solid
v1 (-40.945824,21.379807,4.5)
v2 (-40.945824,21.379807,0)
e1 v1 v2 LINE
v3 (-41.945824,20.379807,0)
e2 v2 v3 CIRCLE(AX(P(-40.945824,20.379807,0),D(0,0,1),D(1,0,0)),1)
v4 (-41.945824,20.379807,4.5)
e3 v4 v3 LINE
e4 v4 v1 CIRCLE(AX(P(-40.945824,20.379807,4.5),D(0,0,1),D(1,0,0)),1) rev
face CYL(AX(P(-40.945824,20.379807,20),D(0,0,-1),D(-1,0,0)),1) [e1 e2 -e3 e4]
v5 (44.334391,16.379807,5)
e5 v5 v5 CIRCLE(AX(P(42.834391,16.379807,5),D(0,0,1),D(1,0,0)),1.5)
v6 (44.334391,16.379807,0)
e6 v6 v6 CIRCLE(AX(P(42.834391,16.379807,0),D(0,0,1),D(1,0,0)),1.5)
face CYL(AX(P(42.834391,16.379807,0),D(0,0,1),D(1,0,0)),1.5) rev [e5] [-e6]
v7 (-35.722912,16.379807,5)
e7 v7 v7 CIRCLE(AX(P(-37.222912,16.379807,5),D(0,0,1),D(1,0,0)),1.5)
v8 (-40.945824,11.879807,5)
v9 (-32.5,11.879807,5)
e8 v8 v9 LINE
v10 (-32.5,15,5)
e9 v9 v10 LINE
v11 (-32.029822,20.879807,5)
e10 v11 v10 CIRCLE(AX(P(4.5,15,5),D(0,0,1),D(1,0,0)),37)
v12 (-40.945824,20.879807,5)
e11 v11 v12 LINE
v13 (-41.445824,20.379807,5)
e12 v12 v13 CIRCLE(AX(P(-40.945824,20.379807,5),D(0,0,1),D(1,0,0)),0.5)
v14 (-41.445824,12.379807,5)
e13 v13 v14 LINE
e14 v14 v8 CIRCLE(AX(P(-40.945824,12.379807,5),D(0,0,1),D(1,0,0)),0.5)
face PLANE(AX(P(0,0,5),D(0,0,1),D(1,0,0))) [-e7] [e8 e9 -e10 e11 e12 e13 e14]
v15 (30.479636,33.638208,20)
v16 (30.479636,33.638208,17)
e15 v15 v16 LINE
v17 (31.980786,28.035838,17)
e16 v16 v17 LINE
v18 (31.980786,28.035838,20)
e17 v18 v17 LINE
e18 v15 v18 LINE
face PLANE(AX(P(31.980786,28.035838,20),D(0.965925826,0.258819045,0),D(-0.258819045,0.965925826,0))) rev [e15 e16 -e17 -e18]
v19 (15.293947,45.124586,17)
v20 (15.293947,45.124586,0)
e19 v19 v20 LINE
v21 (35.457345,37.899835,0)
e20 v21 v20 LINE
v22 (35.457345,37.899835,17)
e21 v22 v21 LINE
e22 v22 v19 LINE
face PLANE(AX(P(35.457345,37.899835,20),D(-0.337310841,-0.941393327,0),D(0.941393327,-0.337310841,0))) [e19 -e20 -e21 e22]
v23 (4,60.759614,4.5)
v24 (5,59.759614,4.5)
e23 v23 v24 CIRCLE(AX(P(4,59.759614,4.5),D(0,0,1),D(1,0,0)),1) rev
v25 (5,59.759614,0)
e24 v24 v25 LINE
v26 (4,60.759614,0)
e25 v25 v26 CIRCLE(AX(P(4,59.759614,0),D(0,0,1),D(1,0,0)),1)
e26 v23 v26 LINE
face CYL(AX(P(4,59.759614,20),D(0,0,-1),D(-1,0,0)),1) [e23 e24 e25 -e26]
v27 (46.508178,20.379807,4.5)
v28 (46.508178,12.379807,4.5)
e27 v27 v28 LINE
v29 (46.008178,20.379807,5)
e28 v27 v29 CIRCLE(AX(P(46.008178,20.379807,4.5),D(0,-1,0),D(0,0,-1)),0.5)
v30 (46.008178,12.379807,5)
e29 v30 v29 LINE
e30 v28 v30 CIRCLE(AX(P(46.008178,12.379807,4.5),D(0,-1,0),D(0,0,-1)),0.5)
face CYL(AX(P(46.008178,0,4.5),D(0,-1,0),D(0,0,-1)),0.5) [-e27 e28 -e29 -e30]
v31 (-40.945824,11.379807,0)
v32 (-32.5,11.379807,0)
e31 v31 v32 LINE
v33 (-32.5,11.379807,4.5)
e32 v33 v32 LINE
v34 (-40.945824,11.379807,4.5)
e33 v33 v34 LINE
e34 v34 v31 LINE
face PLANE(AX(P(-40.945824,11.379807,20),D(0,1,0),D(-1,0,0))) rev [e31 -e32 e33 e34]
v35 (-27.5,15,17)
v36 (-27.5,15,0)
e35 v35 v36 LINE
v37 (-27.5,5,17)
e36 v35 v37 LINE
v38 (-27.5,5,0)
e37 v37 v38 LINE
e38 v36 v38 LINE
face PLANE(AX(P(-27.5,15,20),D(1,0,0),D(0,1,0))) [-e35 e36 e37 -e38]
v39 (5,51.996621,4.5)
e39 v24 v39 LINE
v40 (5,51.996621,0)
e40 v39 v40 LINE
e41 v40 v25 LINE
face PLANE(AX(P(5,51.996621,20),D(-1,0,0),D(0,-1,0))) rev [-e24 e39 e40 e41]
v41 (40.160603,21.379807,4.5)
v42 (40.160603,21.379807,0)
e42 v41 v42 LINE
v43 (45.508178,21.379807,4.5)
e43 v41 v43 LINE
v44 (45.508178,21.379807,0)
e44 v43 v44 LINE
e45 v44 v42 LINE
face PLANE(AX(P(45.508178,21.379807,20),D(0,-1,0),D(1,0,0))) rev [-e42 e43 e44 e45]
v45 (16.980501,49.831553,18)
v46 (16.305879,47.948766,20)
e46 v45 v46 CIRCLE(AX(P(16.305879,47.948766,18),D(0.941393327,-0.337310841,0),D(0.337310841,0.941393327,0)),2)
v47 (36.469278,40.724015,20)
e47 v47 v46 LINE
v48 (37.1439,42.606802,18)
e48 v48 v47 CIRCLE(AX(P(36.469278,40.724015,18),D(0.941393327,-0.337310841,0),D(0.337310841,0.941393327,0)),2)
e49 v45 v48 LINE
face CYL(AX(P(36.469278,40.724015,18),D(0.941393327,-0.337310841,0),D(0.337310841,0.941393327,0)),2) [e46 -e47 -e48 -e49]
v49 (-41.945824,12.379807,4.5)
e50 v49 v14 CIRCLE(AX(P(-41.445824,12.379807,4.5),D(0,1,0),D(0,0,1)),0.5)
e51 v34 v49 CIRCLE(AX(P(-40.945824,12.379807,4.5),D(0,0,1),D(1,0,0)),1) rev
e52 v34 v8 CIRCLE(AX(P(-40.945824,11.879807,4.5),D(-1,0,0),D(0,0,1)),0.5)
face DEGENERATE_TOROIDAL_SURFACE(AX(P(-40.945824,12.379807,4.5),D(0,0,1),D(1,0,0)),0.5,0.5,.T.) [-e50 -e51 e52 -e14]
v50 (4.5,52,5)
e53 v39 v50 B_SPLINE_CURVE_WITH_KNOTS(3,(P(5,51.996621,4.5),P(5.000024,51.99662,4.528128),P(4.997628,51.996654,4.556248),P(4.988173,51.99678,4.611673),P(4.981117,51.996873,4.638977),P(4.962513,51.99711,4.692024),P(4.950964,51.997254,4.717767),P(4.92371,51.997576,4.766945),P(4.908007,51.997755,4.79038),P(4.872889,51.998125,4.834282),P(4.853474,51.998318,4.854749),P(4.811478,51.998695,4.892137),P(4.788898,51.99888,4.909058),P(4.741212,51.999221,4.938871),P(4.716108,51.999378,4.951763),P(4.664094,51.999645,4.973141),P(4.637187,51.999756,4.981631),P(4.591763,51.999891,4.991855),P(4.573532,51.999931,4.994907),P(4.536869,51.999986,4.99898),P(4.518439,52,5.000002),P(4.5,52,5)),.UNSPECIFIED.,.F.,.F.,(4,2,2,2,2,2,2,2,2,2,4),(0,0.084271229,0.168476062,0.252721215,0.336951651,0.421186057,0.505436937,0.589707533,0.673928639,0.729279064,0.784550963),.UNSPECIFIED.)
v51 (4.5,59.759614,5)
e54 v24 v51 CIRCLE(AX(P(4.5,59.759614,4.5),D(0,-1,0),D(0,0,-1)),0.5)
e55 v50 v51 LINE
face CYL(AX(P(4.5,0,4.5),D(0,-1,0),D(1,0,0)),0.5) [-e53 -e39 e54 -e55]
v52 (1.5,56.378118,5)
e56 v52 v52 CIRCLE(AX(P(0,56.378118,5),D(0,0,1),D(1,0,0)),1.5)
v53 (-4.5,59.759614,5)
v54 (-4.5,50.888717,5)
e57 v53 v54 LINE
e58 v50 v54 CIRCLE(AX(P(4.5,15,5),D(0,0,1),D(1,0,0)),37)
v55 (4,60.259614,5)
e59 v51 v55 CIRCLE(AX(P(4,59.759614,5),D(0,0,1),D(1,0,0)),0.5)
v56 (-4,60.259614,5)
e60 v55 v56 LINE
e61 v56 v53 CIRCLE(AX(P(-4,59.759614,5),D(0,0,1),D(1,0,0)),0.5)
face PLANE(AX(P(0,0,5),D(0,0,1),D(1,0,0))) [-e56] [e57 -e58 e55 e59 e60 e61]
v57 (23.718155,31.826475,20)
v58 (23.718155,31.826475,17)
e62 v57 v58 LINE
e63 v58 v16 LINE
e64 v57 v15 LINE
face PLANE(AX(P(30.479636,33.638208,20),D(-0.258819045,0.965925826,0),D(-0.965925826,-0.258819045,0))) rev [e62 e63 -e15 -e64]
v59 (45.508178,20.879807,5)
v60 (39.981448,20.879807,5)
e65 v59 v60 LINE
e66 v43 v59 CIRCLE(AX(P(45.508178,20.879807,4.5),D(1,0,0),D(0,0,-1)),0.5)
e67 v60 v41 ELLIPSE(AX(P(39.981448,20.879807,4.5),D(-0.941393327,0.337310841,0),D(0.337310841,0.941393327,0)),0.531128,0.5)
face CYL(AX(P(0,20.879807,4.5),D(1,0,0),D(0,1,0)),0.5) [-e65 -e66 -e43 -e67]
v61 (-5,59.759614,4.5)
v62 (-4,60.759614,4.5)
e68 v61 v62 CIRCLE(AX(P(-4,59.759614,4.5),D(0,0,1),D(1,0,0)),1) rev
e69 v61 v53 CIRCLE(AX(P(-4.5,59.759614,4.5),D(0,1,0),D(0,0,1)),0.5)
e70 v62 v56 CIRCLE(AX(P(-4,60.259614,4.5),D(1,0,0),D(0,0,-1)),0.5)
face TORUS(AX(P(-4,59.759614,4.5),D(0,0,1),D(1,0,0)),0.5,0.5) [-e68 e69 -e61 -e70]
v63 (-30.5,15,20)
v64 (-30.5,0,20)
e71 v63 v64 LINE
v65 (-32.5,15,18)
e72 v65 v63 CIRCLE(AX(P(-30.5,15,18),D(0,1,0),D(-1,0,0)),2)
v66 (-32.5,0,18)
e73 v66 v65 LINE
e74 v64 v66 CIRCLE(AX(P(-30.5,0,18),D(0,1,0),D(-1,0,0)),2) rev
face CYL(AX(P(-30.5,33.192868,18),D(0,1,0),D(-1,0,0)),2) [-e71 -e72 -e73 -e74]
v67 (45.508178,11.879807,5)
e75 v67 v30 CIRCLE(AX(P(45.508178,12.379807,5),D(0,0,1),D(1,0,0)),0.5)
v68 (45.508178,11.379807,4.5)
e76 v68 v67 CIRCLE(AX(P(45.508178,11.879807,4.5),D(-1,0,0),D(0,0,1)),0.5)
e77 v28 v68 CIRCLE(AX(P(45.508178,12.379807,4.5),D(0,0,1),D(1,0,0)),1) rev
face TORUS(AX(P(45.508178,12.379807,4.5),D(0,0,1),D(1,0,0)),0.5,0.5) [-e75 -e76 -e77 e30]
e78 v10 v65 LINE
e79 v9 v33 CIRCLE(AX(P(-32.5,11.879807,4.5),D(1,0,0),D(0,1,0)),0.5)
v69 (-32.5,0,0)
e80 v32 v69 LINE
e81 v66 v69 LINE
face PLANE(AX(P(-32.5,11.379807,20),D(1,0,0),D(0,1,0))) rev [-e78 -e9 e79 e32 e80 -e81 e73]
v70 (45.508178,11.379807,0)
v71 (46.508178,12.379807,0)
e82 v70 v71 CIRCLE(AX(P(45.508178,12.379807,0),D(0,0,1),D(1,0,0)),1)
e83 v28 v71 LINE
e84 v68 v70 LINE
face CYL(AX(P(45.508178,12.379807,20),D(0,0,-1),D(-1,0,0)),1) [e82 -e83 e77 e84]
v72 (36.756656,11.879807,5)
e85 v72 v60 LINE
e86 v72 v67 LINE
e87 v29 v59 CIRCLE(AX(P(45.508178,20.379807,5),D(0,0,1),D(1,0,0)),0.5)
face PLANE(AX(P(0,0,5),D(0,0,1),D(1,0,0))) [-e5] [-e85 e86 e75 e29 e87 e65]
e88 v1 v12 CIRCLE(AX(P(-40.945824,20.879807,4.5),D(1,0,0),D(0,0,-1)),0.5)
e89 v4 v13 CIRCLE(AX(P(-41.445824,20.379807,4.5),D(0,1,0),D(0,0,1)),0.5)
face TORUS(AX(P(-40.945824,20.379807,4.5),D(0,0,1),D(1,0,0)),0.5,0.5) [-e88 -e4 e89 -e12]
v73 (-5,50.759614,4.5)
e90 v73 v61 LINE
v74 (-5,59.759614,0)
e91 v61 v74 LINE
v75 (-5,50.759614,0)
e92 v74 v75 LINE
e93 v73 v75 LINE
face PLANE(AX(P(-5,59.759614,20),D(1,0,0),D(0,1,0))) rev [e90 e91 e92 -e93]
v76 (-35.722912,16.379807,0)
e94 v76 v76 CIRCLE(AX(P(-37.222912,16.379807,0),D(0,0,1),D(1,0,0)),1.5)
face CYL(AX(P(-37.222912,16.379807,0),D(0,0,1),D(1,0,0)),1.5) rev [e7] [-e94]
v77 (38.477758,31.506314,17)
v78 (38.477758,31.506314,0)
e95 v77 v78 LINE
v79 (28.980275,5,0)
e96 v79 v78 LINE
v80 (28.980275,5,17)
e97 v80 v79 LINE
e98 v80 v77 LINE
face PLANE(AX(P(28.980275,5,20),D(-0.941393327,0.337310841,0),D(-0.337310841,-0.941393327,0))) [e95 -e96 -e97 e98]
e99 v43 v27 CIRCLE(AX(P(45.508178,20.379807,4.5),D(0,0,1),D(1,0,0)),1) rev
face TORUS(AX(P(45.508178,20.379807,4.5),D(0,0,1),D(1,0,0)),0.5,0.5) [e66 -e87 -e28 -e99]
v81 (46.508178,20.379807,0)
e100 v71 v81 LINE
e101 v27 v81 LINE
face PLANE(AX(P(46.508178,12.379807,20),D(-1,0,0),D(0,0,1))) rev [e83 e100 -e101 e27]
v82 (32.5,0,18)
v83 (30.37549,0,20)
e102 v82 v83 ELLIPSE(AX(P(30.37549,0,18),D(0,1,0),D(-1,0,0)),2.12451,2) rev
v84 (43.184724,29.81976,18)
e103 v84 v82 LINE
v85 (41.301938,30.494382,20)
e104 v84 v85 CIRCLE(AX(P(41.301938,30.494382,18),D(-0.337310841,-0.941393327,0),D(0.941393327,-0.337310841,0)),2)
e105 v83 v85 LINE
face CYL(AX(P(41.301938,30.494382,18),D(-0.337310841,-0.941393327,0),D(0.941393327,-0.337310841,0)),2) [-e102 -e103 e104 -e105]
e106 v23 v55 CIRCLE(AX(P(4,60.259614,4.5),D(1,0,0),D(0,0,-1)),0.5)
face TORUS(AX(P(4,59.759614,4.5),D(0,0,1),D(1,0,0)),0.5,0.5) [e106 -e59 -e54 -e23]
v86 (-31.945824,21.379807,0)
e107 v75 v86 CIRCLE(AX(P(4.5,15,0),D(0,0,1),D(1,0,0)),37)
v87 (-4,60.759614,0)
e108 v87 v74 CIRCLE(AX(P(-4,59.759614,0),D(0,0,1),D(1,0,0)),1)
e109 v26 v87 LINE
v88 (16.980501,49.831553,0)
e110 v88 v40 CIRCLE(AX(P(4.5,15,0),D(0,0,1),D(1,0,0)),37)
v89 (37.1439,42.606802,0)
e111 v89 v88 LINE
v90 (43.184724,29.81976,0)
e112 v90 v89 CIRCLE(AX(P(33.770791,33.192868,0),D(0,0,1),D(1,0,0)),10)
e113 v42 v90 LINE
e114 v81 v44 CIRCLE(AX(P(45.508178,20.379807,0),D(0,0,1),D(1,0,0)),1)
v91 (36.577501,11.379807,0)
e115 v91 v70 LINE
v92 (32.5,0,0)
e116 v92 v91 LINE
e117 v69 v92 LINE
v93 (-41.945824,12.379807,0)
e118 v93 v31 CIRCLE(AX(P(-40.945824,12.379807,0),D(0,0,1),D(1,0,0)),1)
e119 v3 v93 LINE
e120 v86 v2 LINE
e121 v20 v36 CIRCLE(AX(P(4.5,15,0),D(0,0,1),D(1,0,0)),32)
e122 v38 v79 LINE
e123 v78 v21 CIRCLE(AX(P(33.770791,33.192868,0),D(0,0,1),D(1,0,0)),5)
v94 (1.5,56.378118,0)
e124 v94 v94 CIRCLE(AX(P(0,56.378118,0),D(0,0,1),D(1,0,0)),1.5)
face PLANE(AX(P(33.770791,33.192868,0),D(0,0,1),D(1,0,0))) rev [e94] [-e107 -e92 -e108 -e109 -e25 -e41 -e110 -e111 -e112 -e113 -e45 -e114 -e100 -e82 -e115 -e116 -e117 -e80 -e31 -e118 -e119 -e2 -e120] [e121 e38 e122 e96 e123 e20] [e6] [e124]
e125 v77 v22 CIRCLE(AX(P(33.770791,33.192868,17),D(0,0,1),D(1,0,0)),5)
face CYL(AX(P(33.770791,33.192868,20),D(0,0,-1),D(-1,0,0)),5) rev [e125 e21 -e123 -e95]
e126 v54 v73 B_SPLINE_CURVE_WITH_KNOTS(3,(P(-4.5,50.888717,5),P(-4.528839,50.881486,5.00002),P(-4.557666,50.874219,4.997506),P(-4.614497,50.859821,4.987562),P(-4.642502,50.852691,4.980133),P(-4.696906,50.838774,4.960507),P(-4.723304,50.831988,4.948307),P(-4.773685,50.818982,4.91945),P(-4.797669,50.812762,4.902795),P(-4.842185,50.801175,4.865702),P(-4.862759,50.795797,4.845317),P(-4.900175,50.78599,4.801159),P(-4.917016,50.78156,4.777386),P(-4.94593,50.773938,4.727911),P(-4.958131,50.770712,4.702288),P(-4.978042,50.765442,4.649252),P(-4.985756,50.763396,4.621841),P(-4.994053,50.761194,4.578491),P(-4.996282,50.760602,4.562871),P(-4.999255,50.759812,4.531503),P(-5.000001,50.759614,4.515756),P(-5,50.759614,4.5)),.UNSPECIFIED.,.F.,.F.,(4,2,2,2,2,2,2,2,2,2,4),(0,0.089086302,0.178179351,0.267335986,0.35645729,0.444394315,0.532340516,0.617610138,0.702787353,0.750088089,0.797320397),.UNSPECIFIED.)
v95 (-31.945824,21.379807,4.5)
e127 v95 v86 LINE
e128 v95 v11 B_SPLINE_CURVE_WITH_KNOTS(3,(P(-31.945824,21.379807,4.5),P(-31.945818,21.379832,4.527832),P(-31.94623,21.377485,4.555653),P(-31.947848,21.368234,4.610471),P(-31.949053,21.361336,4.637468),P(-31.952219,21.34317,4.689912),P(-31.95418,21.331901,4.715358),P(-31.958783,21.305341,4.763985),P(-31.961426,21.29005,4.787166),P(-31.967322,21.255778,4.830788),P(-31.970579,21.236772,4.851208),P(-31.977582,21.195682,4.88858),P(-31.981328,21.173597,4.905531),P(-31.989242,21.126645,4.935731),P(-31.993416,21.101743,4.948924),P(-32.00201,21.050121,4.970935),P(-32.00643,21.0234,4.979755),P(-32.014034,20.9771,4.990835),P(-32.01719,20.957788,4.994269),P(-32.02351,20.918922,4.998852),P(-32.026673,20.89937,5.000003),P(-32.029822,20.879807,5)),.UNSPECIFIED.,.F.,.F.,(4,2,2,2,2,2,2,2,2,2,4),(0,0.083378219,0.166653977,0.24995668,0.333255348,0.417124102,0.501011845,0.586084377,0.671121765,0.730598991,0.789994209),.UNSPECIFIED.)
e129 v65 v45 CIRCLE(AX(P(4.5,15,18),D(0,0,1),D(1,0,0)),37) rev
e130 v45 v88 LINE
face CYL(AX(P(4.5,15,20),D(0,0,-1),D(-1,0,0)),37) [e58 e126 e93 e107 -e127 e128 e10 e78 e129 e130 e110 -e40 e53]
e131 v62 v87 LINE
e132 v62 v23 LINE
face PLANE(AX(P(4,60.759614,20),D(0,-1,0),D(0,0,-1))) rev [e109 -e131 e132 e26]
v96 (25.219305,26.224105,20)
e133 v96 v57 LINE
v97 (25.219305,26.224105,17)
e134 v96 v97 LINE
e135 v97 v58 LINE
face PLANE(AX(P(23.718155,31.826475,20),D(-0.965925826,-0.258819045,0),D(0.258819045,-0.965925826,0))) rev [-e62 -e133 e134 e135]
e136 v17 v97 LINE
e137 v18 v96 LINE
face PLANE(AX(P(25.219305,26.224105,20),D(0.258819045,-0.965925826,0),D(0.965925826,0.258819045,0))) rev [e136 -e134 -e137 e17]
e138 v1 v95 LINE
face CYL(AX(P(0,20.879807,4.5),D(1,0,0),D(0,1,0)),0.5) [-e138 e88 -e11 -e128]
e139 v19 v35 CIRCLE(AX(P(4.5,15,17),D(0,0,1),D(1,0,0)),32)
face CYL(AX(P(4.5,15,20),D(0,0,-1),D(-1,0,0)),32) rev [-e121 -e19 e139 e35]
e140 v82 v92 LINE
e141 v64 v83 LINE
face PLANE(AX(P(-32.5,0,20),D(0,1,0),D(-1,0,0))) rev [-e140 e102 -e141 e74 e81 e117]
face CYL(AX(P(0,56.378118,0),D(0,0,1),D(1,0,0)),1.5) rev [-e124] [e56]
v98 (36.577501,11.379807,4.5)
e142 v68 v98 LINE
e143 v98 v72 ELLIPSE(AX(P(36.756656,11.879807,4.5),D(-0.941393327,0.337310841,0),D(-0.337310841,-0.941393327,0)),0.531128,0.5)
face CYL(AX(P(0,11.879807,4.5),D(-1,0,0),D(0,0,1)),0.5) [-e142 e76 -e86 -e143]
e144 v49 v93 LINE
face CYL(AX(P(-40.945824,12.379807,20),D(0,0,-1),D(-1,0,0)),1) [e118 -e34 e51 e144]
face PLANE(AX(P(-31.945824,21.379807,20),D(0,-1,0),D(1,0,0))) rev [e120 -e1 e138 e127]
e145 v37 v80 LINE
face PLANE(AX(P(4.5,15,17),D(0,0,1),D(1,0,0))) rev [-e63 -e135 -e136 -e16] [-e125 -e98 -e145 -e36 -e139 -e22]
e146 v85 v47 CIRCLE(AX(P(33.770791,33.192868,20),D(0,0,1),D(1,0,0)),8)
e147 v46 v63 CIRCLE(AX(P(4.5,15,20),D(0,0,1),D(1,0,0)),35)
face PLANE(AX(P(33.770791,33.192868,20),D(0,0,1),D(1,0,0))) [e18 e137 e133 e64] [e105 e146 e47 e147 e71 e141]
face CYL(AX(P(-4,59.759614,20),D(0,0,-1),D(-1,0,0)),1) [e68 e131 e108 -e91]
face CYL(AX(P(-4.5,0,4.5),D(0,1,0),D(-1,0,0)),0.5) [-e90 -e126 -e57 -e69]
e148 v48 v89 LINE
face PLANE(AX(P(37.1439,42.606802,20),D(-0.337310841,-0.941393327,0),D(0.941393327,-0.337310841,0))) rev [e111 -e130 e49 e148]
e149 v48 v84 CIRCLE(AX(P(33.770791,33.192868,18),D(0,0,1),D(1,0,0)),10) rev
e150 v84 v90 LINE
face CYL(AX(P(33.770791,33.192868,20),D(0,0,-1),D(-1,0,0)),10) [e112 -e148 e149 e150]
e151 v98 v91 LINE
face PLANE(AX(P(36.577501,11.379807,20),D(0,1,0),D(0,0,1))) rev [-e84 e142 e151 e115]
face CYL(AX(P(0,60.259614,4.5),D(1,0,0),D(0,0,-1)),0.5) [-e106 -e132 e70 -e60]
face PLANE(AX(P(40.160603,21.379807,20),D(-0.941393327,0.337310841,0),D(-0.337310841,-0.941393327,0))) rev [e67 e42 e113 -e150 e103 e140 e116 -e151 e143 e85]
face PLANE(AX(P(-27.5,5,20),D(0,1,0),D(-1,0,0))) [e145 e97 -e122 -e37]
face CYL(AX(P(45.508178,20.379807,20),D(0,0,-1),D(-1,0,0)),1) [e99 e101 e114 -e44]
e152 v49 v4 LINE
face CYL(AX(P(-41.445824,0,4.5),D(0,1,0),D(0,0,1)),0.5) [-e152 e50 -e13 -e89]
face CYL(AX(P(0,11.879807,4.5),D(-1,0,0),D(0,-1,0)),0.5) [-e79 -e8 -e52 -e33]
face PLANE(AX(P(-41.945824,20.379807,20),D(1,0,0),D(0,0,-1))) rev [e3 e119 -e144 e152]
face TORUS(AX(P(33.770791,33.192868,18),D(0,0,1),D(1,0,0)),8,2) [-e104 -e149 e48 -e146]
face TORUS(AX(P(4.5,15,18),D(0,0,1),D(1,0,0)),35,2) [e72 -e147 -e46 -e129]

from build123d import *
from build123d.topology import SkipClean

# Parameters (mm, degrees)
BOSS_EXTRU_1_DEPTH      = 20
BOSS_EXTRU_3_START      = -3
BOSS_EXTRU_3_DEPTH      = 3
ENL_V_MAT_EXTRU_3_DEPTH = 3
ENL_V_START             = -15
ENL_V_MAT_EXTRU_4_DEPTH = 15
ESQUISSE10_R            = 1.5
ENL_V_MAT_EXTRU_5_DEPTH = 78.972696085
CONG_1_R                = 2
CONG_2_R                = 0.5


with BuildPart() as part:
    # Esquisse1 → Boss.-Extru.1 (new body)
    with BuildSketch(Plane.XY):
        with BuildLine():
            Line((-32.5, 11.379807046), (-32.5, 0))
            Line((-32.5, 0), (32.5, 0))
            Line((32.5, 0), (36.577501058, 11.379807046))
            Line((36.577501058, 11.379807046), (45.5081781, 11.379807046))
            ThreePointArc((45.5081781, 11.379807046), (46.215284881, 11.672700265), (46.5081781, 12.379807046))
            Line((46.5081781, 12.379807046), (46.5081781, 20.379807046))
            ThreePointArc((46.5081781, 20.379807046), (46.215284881, 21.086913827), (45.5081781, 21.379807046))
            Line((45.5081781, 21.379807046), (40.160603163, 21.379807046))
            Line((40.160603163, 21.379807046), (43.184724439, 29.819759876))
            ThreePointArc((43.184724439, 29.819759876), (42.812595053, 37.46437651), (37.143899579, 42.60680156))
            Line((37.143899579, 42.60680156), (16.980501125, 49.831553104))
            ThreePointArc((16.980501125, 49.831553104), (11.079911293, 51.410228884), (5, 51.996621467))
            Line((5, 51.996621467), (5, 59.759614092))
            ThreePointArc((5, 59.759614092), (4.707106781, 60.466720873), (4, 60.759614092))
            Line((4, 60.759614092), (-4, 60.759614092))
            ThreePointArc((-4, 60.759614092), (-4.707106781, 60.466720873), (-5, 59.759614092))
            Line((-5, 59.759614092), (-5, 50.759614092))
            ThreePointArc((-5, 50.759614092), (-22.768075535, 40.009039498), (-31.945823657, 21.379807046))
            Line((-31.945823657, 21.379807046), (-40.945823657, 21.379807046))
            ThreePointArc((-40.945823657, 21.379807046), (-41.652930438, 21.086913827), (-41.945823657, 20.379807046))
            Line((-41.945823657, 20.379807046), (-41.945823657, 12.379807046))
            ThreePointArc((-41.945823657, 12.379807046), (-41.652930438, 11.672700265), (-40.945823657, 11.379807046))
            Line((-40.945823657, 11.379807046), (-32.5, 11.379807046))
        make_face()
        with BuildLine():
            Line((-27.5, 15), (-27.5, 5))
            Line((-27.5, 5), (28.980274824, 5))
            Line((28.980274824, 5), (38.477757803, 31.506314082))
            ThreePointArc((38.477757803, 31.506314082), (38.29169311, 35.328622399), (35.457345373, 37.899834924))
            Line((35.457345373, 37.899834924), (15.293946919, 45.124586469))
            ThreePointArc((15.293946919, 45.124586469), (-13.920012196, 41.166833028), (-27.5, 15))
        make_face(mode=Mode.SUBTRACT)
    extrude(amount=BOSS_EXTRU_1_DEPTH)

    # Esquisse5 → Boss.-Extru.3 (add)
    with BuildSketch(Plane.XY.offset(20).offset(BOSS_EXTRU_3_START)):
        with BuildLine():
            Line((-32.5, 11.379807046), (-32.5, 0))
            Line((-32.5, 0), (32.5, 0))
            Line((32.5, 0), (36.577501058, 11.379807046))
            Line((36.577501058, 11.379807046), (45.5081781, 11.379807046))
            ThreePointArc((45.5081781, 11.379807046), (46.215284881, 11.672700265), (46.5081781, 12.379807046))
            Line((46.5081781, 12.379807046), (46.5081781, 20.379807046))
            ThreePointArc((46.5081781, 20.379807046), (46.215284881, 21.086913827), (45.5081781, 21.379807046))
            Line((45.5081781, 21.379807046), (40.160603163, 21.379807046))
            Line((40.160603163, 21.379807046), (43.184724439, 29.819759876))
            ThreePointArc((43.184724439, 29.819759876), (42.812595053, 37.46437651), (37.143899579, 42.60680156))
            Line((37.143899579, 42.60680156), (16.980501125, 49.831553104))
            ThreePointArc((16.980501125, 49.831553104), (11.079911293, 51.410228884), (5, 51.996621467))
            Line((5, 51.996621467), (5, 59.759614092))
            ThreePointArc((5, 59.759614092), (4.707106781, 60.466720873), (4, 60.759614092))
            Line((4, 60.759614092), (-4, 60.759614092))
            ThreePointArc((-4, 60.759614092), (-4.707106781, 60.466720873), (-5, 59.759614092))
            Line((-5, 59.759614092), (-5, 50.759614092))
            ThreePointArc((-5, 50.759614092), (-22.768075535, 40.009039498), (-31.945823657, 21.379807046))
            Line((-31.945823657, 21.379807046), (-40.945823657, 21.379807046))
            ThreePointArc((-40.945823657, 21.379807046), (-41.652930438, 21.086913827), (-41.945823657, 20.379807046))
            Line((-41.945823657, 20.379807046), (-41.945823657, 12.379807046))
            ThreePointArc((-41.945823657, 12.379807046), (-41.652930438, 11.672700265), (-40.945823657, 11.379807046))
            Line((-40.945823657, 11.379807046), (-32.5, 11.379807046))
        make_face()
    extrude(amount=BOSS_EXTRU_3_DEPTH)

    # Esquisse6 → Enlèv. mat.-Extru.3 (cut)
    with BuildSketch(Plane(origin=(0, 0, 17), x_dir=(-1, 0, 0), z_dir=(0, 0, -1))):
        Polygon((-30.479635706, 33.638207866), (-23.718154922, 31.82647455), (-25.219305384, 26.224104758), (-31.980786168, 28.035838073), align=None)
    extrude(amount=-ENL_V_MAT_EXTRU_3_DEPTH, mode=Mode.SUBTRACT)

    # Esquisse9 → Enlèv. mat.-Extru.4 (cut)
    with SkipClean():  # the faces are left unmerged after this step: merging them gives an invalid solid
        with BuildSketch(Plane.XY.offset(20).offset(ENL_V_START)):
            with BuildLine():
                Line((5, 51.996621467), (5, 59.759614092))
                ThreePointArc((5, 59.759614092), (4.707106781, 60.466720873), (4, 60.759614092))
                Line((4, 60.759614092), (-4, 60.759614092))
                ThreePointArc((-4, 60.759614092), (-4.707106781, 60.466720873), (-5, 59.759614092))
                Line((-5, 59.759614092), (-5, 50.759614092))
                ThreePointArc((-5, 50.759614092), (-0.042306332, 51.720123273), (5, 51.996621467))
            make_face()
            with BuildLine():
                Line((-31.945823657, 21.379807046), (-40.945823657, 21.379807046))
                ThreePointArc((-40.945823657, 21.379807046), (-41.652930438, 21.086913827), (-41.945823657, 20.379807046))
                Line((-41.945823657, 20.379807046), (-41.945823657, 12.379807046))
                ThreePointArc((-41.945823657, 12.379807046), (-41.652930438, 11.672700265), (-40.945823657, 11.379807046))
                Line((-40.945823657, 11.379807046), (-32.5, 11.379807046))
                Line((-32.5, 11.379807046), (-32.5, 15))
                ThreePointArc((-32.5, 15), (-32.361195554, 18.201915417), (-31.945823657, 21.379807046))
            make_face()
            with BuildLine():
                Line((36.577501058, 11.379807046), (40.160603163, 21.379807046))
                Line((40.160603163, 21.379807046), (45.5081781, 21.379807046))
                ThreePointArc((45.5081781, 21.379807046), (46.215284881, 21.086913827), (46.5081781, 20.379807046))
                Line((46.5081781, 20.379807046), (46.5081781, 12.379807046))
                ThreePointArc((46.5081781, 12.379807046), (46.215284881, 11.672700265), (45.5081781, 11.379807046))
                Line((45.5081781, 11.379807046), (36.577501058, 11.379807046))
            make_face()
        extrude(amount=ENL_V_MAT_EXTRU_4_DEPTH, mode=Mode.SUBTRACT)

    # Esquisse10 → Enlèv. mat.-Extru.5 (cut, through all)
    with SkipClean():  # the faces are left unmerged after this step: merging them gives an invalid solid
        with BuildSketch(Plane.XY.offset(5)):
            with Locations((-37.222911829, 16.379807046)):
                Circle(ESQUISSE10_R)
            with Locations((0, 56.37811778)):
                Circle(ESQUISSE10_R)
            with Locations((42.834390632, 16.379807046)):
                Circle(ESQUISSE10_R)
        extrude(amount=-ENL_V_MAT_EXTRU_5_DEPTH, mode=Mode.SUBTRACT)

    # Congé1
    cong_1_edges = [part.edges().sort_by_distance(p)[0] for p in [
        (-22.768075535, 40.009039498, 20),
        (42.812595053, 37.46437651, 20),
        (-32.5, 5.689903523, 20),
        (38.369052111, 16.379807046, 20),
        (27.062200352, 46.219177332, 20),
    ]]
    fillet(cong_1_edges, radius=CONG_1_R)

    # Congé2
    # the kernel refuses this fillet: 0.5 mm, written as the material it takes off along each edge
    with BuildSketch(Plane(origin=(-40.945823657, 11.379807046, 5), x_dir=(0, 1, 0), z_dir=(1, 0, 0))) as cong_2_piece_1:
        with BuildLine():
            CenterArc((CONG_2_R, -CONG_2_R), CONG_2_R, 90, 90)
            Line((0, -CONG_2_R), (0, 0))
            Line((0, 0), (CONG_2_R, 0))
        make_face()
    extrude(amount=8.445823657, mode=Mode.SUBTRACT)
    with BuildSketch(Plane(origin=(-40.945823657, 12.379807046, 5), x_dir=(-1, 0, 0), z_dir=(0, 1, 0))) as cong_2_piece_2:
        with BuildLine():
            CenterArc((1 - CONG_2_R, -CONG_2_R), CONG_2_R, 0, 90)
            Line((1 - CONG_2_R, 0), (1, 0))
            Line((1, 0), (1, -CONG_2_R))
        make_face()
    revolve(axis=Axis((-40.945823657, 12.379807046, 5), (0, 0, 1)), revolution_arc=90, mode=Mode.SUBTRACT)
    with BuildSketch(Plane(origin=(-41.945823657, 20.379807046, 5), x_dir=(0, 0, -1), z_dir=(0, -1, 0)), Plane(origin=(4, 60.759614092, 5), x_dir=(0, 0, -1), z_dir=(-1, 0, 0))) as cong_2_piece_3:
        with BuildLine():
            CenterArc((CONG_2_R, CONG_2_R), CONG_2_R, 180, 90)
            Line((0, CONG_2_R), (0, 0))
            Line((0, 0), (CONG_2_R, 0))
        make_face()
    extrude(amount=8, mode=Mode.SUBTRACT)
    with BuildSketch(Plane(origin=(-40.945823657, 20.379807046, 5), x_dir=(0, 1, 0), z_dir=(1, 0, 0))) as cong_2_piece_4:
        with BuildLine():
            CenterArc((1 - CONG_2_R, -CONG_2_R), CONG_2_R, 0, 90)
            Line((1 - CONG_2_R, 0), (1, 0))
            Line((1, 0), (1, -CONG_2_R))
        make_face()
    revolve(axis=Axis((-40.945823657, 20.379807046, 5), (0, 0, 1)), revolution_arc=90, mode=Mode.SUBTRACT)
    with BuildSketch(Plane(origin=(-30.695823657, 21.379807046, 5), x_dir=(0, 0, -1), z_dir=(-1, 0, 0))) as cong_2_piece_5_section:
        with BuildLine():
            CenterArc((CONG_2_R, CONG_2_R), CONG_2_R, 180, 90)
            Line((0, CONG_2_R), (0, 0))
            Line((0, 0), (CONG_2_R, 0))
        make_face()
    cong_2_piece_5 = extrude(amount=10.25, mode=Mode.PRIVATE)
    cong_2_piece_5 = cong_2_piece_5 - Plane(origin=(4.5, 15, 4.88667184), x_dir=(-1, 0, 0), z_dir=(0, 0, -1)) * Cylinder(37, 23, mode=Mode.PRIVATE)
    add(cong_2_piece_5, mode=Mode.SUBTRACT)
    with BuildSketch(Plane(origin=(-5, 59.759614092, 5), x_dir=(0, 0, -1), z_dir=(0, -1, 0))) as cong_2_piece_6_section:
        with BuildLine():
            CenterArc((CONG_2_R, CONG_2_R), CONG_2_R, 180, 90)
            Line((0, CONG_2_R), (0, 0))
            Line((0, 0), (CONG_2_R, 0))
        make_face()
    cong_2_piece_6 = extrude(amount=10.25, mode=Mode.PRIVATE)
    cong_2_piece_6 = cong_2_piece_6 - Plane(origin=(4.5, 15, 4.886602511), x_dir=(-1, 0, 0), z_dir=(0, 0, -1)) * Cylinder(37, 23, mode=Mode.PRIVATE)
    add(cong_2_piece_6, mode=Mode.SUBTRACT)
    with BuildSketch(Plane(origin=(-4, 59.759614092, 5), x_dir=(0, 1, 0), z_dir=(1, 0, 0))) as cong_2_piece_7:
        with BuildLine():
            CenterArc((1 - CONG_2_R, -CONG_2_R), CONG_2_R, 0, 90)
            Line((1 - CONG_2_R, 0), (1, 0))
            Line((1, 0), (1, -CONG_2_R))
        make_face()
    revolve(axis=Axis((-4, 59.759614092, 5), (0, 0, 1)), revolution_arc=90, mode=Mode.SUBTRACT)
    with BuildSketch(Plane(origin=(4, 59.759614092, 5), x_dir=(1, 0, 0), z_dir=(0, -1, 0))) as cong_2_piece_8:
        with BuildLine():
            CenterArc((1 - CONG_2_R, -CONG_2_R), CONG_2_R, 0, 90)
            Line((1 - CONG_2_R, 0), (1, 0))
            Line((1, 0), (1, -CONG_2_R))
        make_face()
    revolve(axis=Axis((4, 59.759614092, 5), (0, 0, 1)), revolution_arc=90, mode=Mode.SUBTRACT)
    with BuildSketch(Plane(origin=(5, 50.746621467, 5), x_dir=(0, 0, -1), z_dir=(0, 1, 0))) as cong_2_piece_9_section:
        with BuildLine():
            CenterArc((CONG_2_R, CONG_2_R), CONG_2_R, 180, 90)
            Line((0, CONG_2_R), (0, 0))
            Line((0, 0), (CONG_2_R, 0))
        make_face()
    cong_2_piece_9 = extrude(amount=9.012992625, mode=Mode.PRIVATE)
    cong_2_piece_9 = cong_2_piece_9 - Plane(origin=(4.5, 15, 4.886794032), x_dir=(-1, 0, 0), z_dir=(0, 0, -1)) * Cylinder(37, 21, mode=Mode.PRIVATE)
    add(cong_2_piece_9, mode=Mode.SUBTRACT)
    with BuildSketch(Plane(origin=(38.910603163, 21.379807046, 5), x_dir=(0, -1, 0), z_dir=(1, 0, 0))) as cong_2_piece_10_section:
        with BuildLine():
            CenterArc((CONG_2_R, CONG_2_R), CONG_2_R, 180, 90)
            Line((0, CONG_2_R), (0, 0))
            Line((0, 0), (CONG_2_R, 0))
        make_face()
    cong_2_piece_10 = extrude(amount=6.597574937, mode=Mode.PRIVATE)
    cong_2_piece_10 = split(cong_2_piece_10, bisect_by=Plane(origin=(40.426309442, 22.121360792, 4.88725891), z_dir=(0.9413933271437573, -0.3373108412269116, 0)), keep=Keep.TOP, mode=Mode.PRIVATE)
    add(cong_2_piece_10, mode=Mode.SUBTRACT)
    with BuildSketch(Plane(origin=(45.5081781, 20.379807046, 5), x_dir=(0, 1, 0), z_dir=(-1, 0, 0))) as cong_2_piece_11:
        with BuildLine():
            CenterArc((1 - CONG_2_R, CONG_2_R), CONG_2_R, 270, 90)
            Line((1 - CONG_2_R, 0), (1, 0))
            Line((1, 0), (1, CONG_2_R))
        make_face()
    revolve(axis=Axis((45.5081781, 20.379807046, 5), (0, 0, -1)), revolution_arc=90, mode=Mode.SUBTRACT)
    with BuildSketch(Plane(origin=(46.5081781, 20.379807046, 5), x_dir=(0, 0, -1), z_dir=(0, -1, 0))) as cong_2_piece_12:
        with BuildLine():
            CenterArc((CONG_2_R, -CONG_2_R), CONG_2_R, 90, 90)
            Line((0, -CONG_2_R), (0, 0))
            Line((0, 0), (CONG_2_R, 0))
        make_face()
    extrude(amount=8, mode=Mode.SUBTRACT)
    with BuildSketch(Plane(origin=(45.5081781, 12.379807046, 5), x_dir=(1, 0, 0), z_dir=(0, 1, 0))) as cong_2_piece_13:
        with BuildLine():
            CenterArc((1 - CONG_2_R, CONG_2_R), CONG_2_R, 270, 90)
            Line((1 - CONG_2_R, 0), (1, 0))
            Line((1, 0), (1, CONG_2_R))
        make_face()
    revolve(axis=Axis((45.5081781, 12.379807046, 5), (0, 0, -1)), revolution_arc=90, mode=Mode.SUBTRACT)
    with BuildSketch(Plane(origin=(45.5081781, 11.379807046, 5), x_dir=(0, 0, -1), z_dir=(-1, 0, 0))) as cong_2_piece_14_section:
        with BuildLine():
            CenterArc((CONG_2_R, -CONG_2_R), CONG_2_R, 90, 90)
            Line((0, -CONG_2_R), (0, 0))
            Line((0, 0), (CONG_2_R, 0))
        make_face()
    cong_2_piece_14 = extrude(amount=10.180677042, mode=Mode.PRIVATE)
    cong_2_piece_14 = split(cong_2_piece_14, bisect_by=Plane(origin=(37.123655208, 12.904056519, 4.886525787), z_dir=(0.9413933271437573, -0.3373108412269116, 0)), keep=Keep.TOP, mode=Mode.PRIVATE)
    add(cong_2_piece_14, mode=Mode.SUBTRACT)


solid = part.part
